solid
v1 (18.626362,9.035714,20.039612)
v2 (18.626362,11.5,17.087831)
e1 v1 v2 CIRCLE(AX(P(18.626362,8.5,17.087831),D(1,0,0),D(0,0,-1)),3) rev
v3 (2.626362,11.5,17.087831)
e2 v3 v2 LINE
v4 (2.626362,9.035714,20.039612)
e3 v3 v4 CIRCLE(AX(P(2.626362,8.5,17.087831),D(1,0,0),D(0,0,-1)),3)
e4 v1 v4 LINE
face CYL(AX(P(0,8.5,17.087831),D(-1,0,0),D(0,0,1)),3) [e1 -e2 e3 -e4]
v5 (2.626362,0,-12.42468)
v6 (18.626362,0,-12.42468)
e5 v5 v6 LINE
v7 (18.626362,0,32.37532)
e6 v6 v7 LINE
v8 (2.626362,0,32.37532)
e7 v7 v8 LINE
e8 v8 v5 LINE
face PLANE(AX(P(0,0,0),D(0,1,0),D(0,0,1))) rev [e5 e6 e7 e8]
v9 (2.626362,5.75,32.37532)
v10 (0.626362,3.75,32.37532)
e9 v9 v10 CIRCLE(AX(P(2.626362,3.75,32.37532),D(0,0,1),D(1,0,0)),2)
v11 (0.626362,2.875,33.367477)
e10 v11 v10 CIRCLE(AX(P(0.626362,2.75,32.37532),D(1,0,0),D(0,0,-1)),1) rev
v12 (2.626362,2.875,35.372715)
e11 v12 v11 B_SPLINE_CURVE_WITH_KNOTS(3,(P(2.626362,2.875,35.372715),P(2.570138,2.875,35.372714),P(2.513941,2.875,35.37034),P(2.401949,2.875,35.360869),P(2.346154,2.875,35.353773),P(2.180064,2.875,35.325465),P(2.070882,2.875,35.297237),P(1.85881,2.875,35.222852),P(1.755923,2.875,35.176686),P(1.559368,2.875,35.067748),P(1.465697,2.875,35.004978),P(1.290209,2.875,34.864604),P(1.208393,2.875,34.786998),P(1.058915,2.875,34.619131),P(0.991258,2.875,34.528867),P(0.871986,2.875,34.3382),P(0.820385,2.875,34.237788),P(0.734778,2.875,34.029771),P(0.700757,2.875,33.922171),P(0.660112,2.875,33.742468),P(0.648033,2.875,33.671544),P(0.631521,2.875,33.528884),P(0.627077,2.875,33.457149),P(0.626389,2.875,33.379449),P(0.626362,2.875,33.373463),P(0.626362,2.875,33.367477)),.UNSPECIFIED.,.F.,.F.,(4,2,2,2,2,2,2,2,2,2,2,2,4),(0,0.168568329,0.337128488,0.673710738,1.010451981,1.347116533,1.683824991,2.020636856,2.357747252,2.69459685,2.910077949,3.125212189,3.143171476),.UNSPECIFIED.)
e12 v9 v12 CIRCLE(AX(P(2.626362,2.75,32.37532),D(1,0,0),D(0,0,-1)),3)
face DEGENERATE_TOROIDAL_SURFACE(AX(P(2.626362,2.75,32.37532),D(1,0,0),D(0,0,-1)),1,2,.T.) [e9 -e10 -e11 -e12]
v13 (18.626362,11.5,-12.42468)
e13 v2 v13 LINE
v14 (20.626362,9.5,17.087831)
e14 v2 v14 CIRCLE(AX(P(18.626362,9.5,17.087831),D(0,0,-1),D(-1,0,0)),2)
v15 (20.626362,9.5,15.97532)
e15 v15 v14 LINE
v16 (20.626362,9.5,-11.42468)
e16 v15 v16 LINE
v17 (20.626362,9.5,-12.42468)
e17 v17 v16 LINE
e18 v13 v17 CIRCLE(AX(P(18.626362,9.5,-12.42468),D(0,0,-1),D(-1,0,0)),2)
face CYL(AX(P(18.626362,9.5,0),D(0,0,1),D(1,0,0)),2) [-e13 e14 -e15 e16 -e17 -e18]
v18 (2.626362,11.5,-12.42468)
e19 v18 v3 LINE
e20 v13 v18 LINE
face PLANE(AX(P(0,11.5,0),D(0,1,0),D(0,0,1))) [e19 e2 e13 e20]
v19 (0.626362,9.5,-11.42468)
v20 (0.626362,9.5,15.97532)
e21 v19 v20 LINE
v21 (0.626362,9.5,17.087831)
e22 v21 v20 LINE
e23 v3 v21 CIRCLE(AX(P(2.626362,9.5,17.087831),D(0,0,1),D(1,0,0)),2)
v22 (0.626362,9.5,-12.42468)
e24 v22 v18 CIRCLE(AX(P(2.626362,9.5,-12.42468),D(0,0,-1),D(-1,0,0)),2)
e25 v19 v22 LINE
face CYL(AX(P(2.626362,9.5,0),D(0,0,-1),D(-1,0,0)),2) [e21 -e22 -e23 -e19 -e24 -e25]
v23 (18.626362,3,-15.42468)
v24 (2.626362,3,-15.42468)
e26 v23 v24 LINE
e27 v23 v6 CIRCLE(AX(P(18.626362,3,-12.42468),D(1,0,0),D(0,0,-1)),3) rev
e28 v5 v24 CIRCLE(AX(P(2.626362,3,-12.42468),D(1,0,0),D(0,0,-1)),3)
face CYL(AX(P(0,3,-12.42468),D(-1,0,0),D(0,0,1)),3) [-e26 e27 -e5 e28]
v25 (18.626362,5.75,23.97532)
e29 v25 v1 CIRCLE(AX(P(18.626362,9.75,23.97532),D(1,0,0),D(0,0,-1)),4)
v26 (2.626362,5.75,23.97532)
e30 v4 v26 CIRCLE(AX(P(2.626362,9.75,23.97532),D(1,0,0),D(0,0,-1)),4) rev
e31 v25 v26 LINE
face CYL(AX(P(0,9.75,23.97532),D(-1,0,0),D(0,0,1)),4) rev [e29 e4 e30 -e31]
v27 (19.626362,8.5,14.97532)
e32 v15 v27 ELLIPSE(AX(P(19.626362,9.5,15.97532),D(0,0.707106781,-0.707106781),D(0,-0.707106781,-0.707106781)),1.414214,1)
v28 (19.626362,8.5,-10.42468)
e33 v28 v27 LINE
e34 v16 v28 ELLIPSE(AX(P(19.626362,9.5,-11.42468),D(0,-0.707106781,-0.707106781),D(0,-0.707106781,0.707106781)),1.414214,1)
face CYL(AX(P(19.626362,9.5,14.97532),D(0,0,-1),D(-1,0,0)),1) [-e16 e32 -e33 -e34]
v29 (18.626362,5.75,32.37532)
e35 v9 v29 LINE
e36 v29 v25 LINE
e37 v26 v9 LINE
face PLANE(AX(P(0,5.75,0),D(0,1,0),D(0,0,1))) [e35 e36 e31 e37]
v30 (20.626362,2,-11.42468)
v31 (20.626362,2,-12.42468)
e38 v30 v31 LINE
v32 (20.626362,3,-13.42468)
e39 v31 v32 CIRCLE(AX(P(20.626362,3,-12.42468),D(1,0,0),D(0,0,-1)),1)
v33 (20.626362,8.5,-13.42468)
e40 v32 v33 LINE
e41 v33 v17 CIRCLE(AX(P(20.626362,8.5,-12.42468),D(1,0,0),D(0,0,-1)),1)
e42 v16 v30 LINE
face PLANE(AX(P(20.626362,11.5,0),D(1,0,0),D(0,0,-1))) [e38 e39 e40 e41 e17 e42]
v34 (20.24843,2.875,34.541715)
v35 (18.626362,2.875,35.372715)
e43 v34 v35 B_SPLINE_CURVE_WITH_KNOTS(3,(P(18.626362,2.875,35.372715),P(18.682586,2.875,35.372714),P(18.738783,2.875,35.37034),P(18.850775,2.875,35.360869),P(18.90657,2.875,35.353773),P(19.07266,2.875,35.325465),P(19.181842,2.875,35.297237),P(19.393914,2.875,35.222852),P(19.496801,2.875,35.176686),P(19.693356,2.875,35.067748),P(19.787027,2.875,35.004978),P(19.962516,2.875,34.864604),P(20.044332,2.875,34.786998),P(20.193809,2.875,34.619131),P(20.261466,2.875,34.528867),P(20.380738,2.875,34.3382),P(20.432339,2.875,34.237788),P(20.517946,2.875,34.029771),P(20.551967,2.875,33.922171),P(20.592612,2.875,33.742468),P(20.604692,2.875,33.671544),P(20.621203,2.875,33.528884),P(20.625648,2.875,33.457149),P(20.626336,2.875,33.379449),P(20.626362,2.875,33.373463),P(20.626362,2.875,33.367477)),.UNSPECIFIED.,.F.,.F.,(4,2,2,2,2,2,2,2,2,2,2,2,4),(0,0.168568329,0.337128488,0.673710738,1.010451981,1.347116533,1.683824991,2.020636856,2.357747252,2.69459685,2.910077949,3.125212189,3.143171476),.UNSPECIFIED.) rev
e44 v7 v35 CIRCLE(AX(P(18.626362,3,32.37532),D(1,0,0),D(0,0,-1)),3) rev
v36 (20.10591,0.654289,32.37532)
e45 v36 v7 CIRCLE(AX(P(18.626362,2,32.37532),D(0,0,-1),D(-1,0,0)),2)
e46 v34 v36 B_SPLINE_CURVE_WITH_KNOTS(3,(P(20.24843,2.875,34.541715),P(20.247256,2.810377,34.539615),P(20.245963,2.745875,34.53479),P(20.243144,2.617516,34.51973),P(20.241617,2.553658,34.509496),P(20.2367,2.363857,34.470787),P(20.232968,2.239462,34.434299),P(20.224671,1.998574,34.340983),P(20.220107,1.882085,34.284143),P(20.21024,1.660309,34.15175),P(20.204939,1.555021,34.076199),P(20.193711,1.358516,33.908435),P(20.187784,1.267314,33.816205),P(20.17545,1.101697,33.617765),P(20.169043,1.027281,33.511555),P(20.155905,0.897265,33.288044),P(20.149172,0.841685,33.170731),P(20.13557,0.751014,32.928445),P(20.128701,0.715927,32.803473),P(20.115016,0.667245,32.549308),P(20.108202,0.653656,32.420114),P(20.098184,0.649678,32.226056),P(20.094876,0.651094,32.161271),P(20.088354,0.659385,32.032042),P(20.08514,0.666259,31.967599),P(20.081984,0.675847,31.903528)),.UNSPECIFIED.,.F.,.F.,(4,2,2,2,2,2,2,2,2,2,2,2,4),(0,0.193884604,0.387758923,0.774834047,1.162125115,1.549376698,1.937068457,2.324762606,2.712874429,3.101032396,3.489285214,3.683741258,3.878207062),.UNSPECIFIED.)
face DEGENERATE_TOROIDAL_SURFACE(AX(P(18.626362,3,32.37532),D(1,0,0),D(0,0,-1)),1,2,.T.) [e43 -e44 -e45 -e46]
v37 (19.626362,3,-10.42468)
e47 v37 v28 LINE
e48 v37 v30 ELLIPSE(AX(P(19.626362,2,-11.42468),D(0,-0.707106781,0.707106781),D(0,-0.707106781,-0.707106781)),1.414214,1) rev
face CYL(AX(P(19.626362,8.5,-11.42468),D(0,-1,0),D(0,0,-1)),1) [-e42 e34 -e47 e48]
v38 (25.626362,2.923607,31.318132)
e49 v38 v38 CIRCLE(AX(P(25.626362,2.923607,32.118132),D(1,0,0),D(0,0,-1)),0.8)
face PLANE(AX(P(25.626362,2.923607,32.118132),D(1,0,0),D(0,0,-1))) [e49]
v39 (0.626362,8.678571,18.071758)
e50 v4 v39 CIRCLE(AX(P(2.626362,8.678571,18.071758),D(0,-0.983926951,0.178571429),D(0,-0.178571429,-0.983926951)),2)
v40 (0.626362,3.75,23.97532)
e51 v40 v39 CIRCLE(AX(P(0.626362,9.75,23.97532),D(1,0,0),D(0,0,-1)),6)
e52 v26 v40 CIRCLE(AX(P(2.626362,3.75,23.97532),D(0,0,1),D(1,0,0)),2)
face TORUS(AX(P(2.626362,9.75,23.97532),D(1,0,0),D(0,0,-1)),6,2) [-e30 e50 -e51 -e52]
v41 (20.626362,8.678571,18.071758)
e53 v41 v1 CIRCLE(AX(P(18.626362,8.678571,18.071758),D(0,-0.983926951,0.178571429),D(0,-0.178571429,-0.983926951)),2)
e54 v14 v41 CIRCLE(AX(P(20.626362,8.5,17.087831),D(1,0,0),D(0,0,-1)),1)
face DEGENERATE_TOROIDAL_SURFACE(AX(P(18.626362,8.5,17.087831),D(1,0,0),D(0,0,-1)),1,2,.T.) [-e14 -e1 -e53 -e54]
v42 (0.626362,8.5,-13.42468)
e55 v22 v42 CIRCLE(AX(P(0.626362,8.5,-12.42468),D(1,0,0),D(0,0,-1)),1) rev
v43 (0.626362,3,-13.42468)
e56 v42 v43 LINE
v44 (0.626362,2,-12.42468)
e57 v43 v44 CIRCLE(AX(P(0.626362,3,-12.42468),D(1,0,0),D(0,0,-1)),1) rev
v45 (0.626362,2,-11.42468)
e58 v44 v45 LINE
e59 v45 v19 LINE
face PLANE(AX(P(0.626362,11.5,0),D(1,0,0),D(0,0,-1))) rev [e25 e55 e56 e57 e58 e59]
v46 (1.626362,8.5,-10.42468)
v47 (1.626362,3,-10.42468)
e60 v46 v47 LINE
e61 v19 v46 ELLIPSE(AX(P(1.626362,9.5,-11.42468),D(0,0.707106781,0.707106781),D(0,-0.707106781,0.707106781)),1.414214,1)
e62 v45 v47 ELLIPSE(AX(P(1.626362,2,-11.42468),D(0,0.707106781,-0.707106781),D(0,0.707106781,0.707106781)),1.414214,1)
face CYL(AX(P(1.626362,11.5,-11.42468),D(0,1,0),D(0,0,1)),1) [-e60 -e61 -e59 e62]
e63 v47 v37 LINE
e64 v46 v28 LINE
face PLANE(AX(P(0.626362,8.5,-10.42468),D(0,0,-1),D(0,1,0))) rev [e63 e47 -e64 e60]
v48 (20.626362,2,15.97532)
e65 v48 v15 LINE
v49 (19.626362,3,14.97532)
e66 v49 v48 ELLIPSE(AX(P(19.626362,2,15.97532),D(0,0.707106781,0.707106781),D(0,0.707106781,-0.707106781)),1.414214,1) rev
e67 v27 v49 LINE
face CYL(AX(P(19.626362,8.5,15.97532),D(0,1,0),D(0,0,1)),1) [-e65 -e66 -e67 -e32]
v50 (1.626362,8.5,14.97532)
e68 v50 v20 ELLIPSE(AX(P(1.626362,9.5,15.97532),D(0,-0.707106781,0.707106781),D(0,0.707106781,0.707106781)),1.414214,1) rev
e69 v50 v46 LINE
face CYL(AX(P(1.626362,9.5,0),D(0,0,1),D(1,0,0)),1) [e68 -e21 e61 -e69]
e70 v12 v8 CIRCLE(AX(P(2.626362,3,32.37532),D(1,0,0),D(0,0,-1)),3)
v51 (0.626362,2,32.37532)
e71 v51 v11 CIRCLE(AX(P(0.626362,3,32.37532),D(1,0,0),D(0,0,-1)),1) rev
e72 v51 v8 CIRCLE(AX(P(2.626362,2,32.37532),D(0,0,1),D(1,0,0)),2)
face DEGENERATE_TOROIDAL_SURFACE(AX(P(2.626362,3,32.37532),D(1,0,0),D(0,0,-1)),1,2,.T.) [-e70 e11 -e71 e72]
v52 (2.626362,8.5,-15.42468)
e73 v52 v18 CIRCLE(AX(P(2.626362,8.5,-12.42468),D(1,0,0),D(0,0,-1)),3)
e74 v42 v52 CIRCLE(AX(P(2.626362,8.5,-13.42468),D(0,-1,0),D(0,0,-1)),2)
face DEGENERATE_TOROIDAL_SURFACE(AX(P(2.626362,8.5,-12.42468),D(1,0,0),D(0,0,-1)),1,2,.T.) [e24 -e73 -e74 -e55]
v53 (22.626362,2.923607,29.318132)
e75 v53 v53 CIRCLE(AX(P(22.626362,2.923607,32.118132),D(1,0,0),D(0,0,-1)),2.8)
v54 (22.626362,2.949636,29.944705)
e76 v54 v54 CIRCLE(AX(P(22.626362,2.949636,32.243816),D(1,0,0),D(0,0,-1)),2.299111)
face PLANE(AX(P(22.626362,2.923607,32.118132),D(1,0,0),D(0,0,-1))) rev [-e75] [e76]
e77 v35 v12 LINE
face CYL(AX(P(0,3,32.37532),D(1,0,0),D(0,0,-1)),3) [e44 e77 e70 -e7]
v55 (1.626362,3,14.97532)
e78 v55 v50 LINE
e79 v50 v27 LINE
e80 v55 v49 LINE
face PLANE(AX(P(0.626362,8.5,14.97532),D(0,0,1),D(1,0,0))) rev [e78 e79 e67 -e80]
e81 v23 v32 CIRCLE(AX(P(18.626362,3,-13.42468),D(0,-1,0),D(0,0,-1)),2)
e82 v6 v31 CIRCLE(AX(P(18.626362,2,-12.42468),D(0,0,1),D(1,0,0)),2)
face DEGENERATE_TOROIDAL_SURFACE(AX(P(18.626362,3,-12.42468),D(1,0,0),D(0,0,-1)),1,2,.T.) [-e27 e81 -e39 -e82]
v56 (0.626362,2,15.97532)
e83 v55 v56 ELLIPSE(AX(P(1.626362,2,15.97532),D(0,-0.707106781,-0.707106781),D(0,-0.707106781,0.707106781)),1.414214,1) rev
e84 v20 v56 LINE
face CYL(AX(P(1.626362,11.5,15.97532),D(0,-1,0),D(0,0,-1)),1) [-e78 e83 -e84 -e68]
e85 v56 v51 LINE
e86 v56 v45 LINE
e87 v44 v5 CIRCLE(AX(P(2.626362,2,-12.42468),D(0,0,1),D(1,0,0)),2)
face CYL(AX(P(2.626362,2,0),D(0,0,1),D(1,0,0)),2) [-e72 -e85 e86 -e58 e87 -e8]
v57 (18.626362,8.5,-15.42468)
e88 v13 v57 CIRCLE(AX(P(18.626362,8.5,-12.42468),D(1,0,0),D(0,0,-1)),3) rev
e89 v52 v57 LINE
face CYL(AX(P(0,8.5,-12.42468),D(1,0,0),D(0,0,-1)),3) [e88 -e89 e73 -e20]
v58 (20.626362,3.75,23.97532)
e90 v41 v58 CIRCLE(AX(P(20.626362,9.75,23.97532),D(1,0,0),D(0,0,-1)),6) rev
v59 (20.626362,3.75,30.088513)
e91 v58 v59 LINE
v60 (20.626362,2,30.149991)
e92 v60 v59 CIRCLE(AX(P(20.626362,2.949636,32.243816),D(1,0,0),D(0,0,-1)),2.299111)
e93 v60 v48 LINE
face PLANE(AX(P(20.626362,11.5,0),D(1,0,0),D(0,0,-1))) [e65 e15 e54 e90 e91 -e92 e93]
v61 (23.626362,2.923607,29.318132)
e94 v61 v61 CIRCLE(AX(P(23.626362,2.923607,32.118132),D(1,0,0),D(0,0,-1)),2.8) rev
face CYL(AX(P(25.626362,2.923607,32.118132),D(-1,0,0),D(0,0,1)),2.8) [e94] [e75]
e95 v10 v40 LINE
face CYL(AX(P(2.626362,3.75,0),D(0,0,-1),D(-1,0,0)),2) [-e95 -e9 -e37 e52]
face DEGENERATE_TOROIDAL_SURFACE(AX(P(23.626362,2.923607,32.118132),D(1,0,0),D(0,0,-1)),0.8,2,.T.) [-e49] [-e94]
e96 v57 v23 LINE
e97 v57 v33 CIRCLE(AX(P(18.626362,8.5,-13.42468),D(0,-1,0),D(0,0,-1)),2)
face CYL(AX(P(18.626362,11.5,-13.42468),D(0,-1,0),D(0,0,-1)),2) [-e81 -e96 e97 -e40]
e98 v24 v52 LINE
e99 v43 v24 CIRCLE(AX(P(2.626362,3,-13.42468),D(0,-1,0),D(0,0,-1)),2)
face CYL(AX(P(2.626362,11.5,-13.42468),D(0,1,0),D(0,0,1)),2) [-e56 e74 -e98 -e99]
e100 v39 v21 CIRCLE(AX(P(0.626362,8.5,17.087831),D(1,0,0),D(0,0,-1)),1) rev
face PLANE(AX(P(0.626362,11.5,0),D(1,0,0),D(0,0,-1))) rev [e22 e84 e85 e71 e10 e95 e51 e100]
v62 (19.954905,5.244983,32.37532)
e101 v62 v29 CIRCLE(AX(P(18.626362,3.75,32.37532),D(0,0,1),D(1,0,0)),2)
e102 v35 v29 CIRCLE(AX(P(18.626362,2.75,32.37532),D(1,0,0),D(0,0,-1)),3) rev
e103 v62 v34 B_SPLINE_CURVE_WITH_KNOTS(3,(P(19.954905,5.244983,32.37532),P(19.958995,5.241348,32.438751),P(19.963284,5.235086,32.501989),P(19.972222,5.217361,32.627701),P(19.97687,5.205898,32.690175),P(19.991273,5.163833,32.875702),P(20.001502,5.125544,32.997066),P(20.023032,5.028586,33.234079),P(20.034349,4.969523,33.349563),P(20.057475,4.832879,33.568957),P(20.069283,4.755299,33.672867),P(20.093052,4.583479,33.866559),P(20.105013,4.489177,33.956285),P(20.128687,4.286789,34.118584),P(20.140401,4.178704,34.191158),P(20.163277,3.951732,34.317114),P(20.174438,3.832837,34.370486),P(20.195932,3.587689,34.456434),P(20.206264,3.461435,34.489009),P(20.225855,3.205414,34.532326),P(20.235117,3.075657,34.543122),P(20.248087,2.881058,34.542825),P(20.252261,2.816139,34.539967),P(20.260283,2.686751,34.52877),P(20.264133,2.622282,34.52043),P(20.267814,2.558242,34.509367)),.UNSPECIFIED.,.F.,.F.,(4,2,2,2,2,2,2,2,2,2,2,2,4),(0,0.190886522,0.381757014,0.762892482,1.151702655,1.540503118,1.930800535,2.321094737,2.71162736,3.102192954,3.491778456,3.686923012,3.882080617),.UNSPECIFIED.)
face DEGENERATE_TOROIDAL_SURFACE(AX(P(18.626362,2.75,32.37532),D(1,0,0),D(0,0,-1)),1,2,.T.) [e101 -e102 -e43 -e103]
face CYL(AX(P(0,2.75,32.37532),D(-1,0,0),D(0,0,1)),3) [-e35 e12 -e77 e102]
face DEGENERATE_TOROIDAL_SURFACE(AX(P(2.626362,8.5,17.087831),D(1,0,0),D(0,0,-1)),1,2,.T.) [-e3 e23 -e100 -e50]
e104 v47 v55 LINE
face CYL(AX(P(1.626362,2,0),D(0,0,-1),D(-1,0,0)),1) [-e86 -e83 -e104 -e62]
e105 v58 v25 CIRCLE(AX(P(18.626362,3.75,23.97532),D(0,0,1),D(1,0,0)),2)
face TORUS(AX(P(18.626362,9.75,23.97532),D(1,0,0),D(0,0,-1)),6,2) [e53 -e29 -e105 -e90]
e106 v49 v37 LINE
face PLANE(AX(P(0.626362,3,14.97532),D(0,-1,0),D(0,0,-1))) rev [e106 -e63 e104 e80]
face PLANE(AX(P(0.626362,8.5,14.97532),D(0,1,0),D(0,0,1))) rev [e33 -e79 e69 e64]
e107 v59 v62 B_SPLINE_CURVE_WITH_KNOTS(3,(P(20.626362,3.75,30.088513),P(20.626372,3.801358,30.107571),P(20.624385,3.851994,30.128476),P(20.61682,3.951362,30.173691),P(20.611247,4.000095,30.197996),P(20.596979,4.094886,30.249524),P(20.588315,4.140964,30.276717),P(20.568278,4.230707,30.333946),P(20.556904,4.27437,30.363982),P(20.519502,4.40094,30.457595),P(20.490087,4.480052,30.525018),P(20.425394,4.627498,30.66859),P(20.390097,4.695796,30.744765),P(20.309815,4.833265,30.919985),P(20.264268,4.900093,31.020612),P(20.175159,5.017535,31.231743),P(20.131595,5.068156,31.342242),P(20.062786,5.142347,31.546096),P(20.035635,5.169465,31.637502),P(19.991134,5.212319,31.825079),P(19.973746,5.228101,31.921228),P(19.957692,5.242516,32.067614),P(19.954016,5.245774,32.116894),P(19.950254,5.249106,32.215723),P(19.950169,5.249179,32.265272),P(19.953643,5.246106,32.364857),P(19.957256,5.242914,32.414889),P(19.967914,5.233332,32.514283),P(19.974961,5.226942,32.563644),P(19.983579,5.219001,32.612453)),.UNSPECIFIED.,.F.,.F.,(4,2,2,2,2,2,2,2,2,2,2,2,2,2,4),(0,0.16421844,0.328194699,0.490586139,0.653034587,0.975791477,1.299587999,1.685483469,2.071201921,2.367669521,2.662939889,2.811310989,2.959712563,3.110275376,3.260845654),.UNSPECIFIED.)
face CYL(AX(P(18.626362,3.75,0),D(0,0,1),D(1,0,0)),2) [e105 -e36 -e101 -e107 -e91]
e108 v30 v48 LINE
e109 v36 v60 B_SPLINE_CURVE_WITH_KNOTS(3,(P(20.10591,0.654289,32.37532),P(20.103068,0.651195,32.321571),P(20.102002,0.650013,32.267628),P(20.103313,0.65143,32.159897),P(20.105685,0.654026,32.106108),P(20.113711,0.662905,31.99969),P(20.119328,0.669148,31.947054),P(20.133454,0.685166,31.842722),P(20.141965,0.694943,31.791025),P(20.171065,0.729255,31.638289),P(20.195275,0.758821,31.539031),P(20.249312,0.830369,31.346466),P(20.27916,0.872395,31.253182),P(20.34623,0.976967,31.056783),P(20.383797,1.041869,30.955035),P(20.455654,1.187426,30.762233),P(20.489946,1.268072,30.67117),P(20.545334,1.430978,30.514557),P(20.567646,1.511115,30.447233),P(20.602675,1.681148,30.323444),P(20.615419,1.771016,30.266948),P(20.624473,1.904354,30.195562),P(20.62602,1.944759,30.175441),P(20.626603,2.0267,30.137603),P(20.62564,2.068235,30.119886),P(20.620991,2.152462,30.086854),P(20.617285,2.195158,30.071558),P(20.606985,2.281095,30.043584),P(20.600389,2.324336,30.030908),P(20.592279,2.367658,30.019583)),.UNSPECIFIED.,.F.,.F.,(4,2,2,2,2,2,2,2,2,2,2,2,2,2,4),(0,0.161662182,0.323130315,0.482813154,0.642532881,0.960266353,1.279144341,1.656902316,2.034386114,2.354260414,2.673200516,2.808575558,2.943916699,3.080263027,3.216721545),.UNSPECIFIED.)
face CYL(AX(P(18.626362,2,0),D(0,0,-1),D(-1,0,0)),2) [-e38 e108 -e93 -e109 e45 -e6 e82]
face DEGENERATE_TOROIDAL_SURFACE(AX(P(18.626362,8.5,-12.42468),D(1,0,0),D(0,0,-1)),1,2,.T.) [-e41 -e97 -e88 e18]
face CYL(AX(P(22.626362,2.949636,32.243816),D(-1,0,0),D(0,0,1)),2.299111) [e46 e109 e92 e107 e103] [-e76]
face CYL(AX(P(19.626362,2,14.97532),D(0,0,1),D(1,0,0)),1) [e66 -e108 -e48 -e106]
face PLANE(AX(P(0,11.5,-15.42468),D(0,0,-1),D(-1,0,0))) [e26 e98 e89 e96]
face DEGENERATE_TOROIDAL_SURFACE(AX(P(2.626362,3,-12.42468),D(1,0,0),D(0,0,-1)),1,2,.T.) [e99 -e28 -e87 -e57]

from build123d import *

# Parameters (mm, degrees)
SKETCH1_W           = 20
SKETCH1_H           = 25.4
BOSS_EXTRUDE1_DEPTH = 11.5
SKETCH1_3_W         = 20
SKETCH1_3_H         = 25.4
BOSS_EXTRUDE2_DEPTH = 5.75
SKETCH3_W           = 20
SKETCH3_H           = 5.75
BOSS_EXTRUDE3_DEPTH = 10
SKETCH4_W           = 25.4
SKETCH4_H           = 5.5
CUT_EXTRUDE1_DEPTH  = 43.233437778
FILLET1_R           = 1
FILLET2_R           = 1
FILLET3_R           = 3
FILLET4_R           = 3
FILLET5_R           = 4
FILLET6_R           = 3
SKETCH6_R           = 2.299110901
BOSS_EXTRUDE4_DEPTH = 2
FILLET7_R           = 3
SKETCH8_R           = 2.8
BOSS_EXTRUDE6_DEPTH = 3
FILLET9_R           = 2
FILLET10_R          = 2
FILLET11_R          = 2


with BuildPart() as part:
    # Sketch1 → Boss-Extrude1 (new body)
    with BuildSketch(Plane(origin=(0, 0, 0), x_dir=(1, 0, 0), z_dir=(0, 1, 0))):
        with Locations((10.626362144, 2.72467998)):
            Rectangle(SKETCH1_W, SKETCH1_H)
    extrude(amount=BOSS_EXTRUDE1_DEPTH)

    # Sketch1<3> → Boss-Extrude2 (add)
    with BuildSketch(Plane(origin=(0, 0, 0), x_dir=(1, 0, 0), z_dir=(0, 1, 0))):
        with Locations((10.626362144, -22.67532002)):
            Rectangle(SKETCH1_3_W, SKETCH1_3_H)
    extrude(amount=BOSS_EXTRUDE2_DEPTH)

    # Sketch3 → Boss-Extrude3 (add)
    with BuildSketch(Plane.XY.offset(9.97532002)):
        with Locations((10.626362144, 8.625)):
            Rectangle(SKETCH3_W, SKETCH3_H)
    extrude(amount=BOSS_EXTRUDE3_DEPTH)

    # Sketch4 → Cut-Extrude1 (cut, through all)
    with BuildSketch(Plane(origin=(20.626362144, 0, 0), x_dir=(0, 0, -1), z_dir=(1, 0, 0))):
        with Locations((-2.27532002, 5.75)):
            Rectangle(SKETCH4_W, SKETCH4_H)
    extrude(amount=-CUT_EXTRUDE1_DEPTH, mode=Mode.SUBTRACT)

    # Fillet1
    fillet1_edges = [part.edges().sort_by_distance(p)[0] for p in [
        (20.626362144, 5.75, 14.97532002),
        (20.626362144, 3, 2.27532002),
        (20.626362144, 5.75, -10.42467998),
        (20.626362144, 8.5, 2.27532002),
    ]]
    fillet(fillet1_edges, radius=FILLET1_R)

    # Fillet2
    fillet2_edges = [part.edges().sort_by_distance(p)[0] for p in [
        (0.626362144, 5.75, 14.97532002),
        (0.626362144, 8.5, 2.27532002),
        (0.626362144, 5.75, -10.42467998),
        (0.626362144, 3, 2.27532002),
    ]]
    fillet(fillet2_edges, radius=FILLET2_R)

    # Fillet3
    fillet3_edges = [part.edges().sort_by_distance(p)[0] for p in [
        (10.626362144, 11.5, -15.42467998),
    ]]
    fillet(fillet3_edges, radius=FILLET3_R)

    # Fillet4
    fillet4_edges = [part.edges().sort_by_distance(p)[0] for p in [
        (10.626362144, 0, -15.42467998),
    ]]
    fillet(fillet4_edges, radius=FILLET4_R)

    # Fillet5
    fillet5_edges = [part.edges().sort_by_distance(p)[0] for p in [
        (10.626362144, 5.75, 19.97532002),
    ]]
    fillet(fillet5_edges, radius=FILLET5_R)

    # Fillet6
    fillet6_edges = [part.edges().sort_by_distance(p)[0] for p in [
        (10.626362144, 11.5, 19.97532002),
    ]]
    fillet(fillet6_edges, radius=FILLET6_R)

    # Sketch6 → Boss-Extrude4 (add)
    with BuildSketch(Plane(origin=(20.626362144, 0, 0), x_dir=(0, 0, -1), z_dir=(1, 0, 0))):
        with Locations((-32.243815698, 2.949635855)):
            Circle(SKETCH6_R)
    extrude(amount=BOSS_EXTRUDE4_DEPTH)

    # Fillet7
    # the kernel refuses this fillet: 3 mm, written as the material it takes off along each edge
    with BuildSketch(Plane(origin=(-6.873637856, 0, 35.37532002), x_dir=(0, 1, 0), z_dir=(1, 0, 0)), Plane(origin=(-6.873637856, 5.75, 35.37532002), x_dir=(0, 0, -1), z_dir=(1, 0, 0))) as fillet7_piece_1:
        with BuildLine():
            CenterArc((FILLET7_R, -FILLET7_R), FILLET7_R, 90, 90)
            Line((0, -FILLET7_R), (0, 0))
            Line((0, 0), (FILLET7_R, 0))
        make_face()
    extrude(amount=35, mode=Mode.SUBTRACT)

    # Sketch8 → Boss-Extrude6 (add)
    with BuildSketch(Plane(origin=(22.626362144, 0, 0), x_dir=(0, 0, -1), z_dir=(1, 0, 0))):
        with Locations((-32.118132116, 2.923606681)):
            Circle(SKETCH8_R)
    extrude(amount=BOSS_EXTRUDE6_DEPTH)

    # Fillet9
    fillet9_edges = [part.edges().sort_by_distance(p)[0] for p in [
        (25.626362144, 2.923606681, 34.918132116),
    ]]
    fillet(fillet9_edges, radius=FILLET9_R)

    # Fillet10
    # the kernel refuses this fillet: 2 mm, written as the material it takes off along each edge
    with BuildSketch(Plane(origin=(0.626362144, 9.75, 23.97532002), x_dir=(0, -0.17857142857142888, -0.9839269509968508), z_dir=(0, 0.9839269509968508, -0.17857142857142888))) as fillet10_piece_1:
        with BuildLine():
            CenterArc((4 + FILLET10_R, -FILLET10_R), FILLET10_R, 90, 90)
            Line((4 + FILLET10_R, 0), (4, 0))
            Line((4, 0), (4, -FILLET10_R))
        make_face()
    revolve(axis=Axis((0.626362144, 9.75, 23.97532002), (-1, 0, 0)), revolution_arc=79.713439389, mode=Mode.SUBTRACT)
    with BuildSketch(Plane(origin=(0.626362144, 8.500000013, 17.087831374), x_dir=(0, 0.17857142509559704, 0.9839269516276742), z_dir=(0, -0.9839269516276742, 0.17857142509559704))) as fillet10_piece_2:
        with BuildLine():
            CenterArc((2.999999987 - FILLET10_R * 1.00000000192, -FILLET10_R), FILLET10_R, 360, 90)
            Line((2.999999987 - FILLET10_R * 1.00000000192, 0), (2.999999987, 0))
            Line((2.999999987, 0), (2.999999987 - FILLET10_R * 1.92114524289e-09, -FILLET10_R))
        make_face()
    revolve(axis=Axis((0.626362144, 8.500000013, 17.087831374), (-1, 0, 0)), revolution_arc=79.713439793, mode=Mode.SUBTRACT)
    with BuildSketch(Plane(origin=(0.626362144, 2.75, 32.37532002), x_dir=(0, -0.9984974283407907, -0.05479859119382269), z_dir=(0, 0.05479859119382269, -0.9984974283407907))) as fillet10_piece_3:
        with BuildLine():
            CenterArc((3 - FILLET10_R, -FILLET10_R), FILLET10_R, 0, 90)
            Line((3 - FILLET10_R, 0), (3, 0))
            Line((3, 0), (3, -FILLET10_R))
        make_face()
    revolve(axis=Axis((0.626362144, 2.75, 32.37532002), (-1, 0, 0)), revolution_arc=183.1413015, mode=Mode.SUBTRACT)
    with BuildSketch(Plane(origin=(0.626362144, 3, 32.37532002), x_dir=(0, -1, 0), z_dir=(0, 0, -1))) as fillet10_piece_4:
        with BuildLine():
            CenterArc((3 - FILLET10_R, -FILLET10_R), FILLET10_R, 0, 90)
            Line((3 - FILLET10_R, 0), (3, 0))
            Line((3, 0), (3, -FILLET10_R))
        make_face()
    revolve(axis=Axis((0.626362144, 3, 32.37532002), (-1, 0, 0)), revolution_arc=183.1413015, mode=Mode.SUBTRACT)
    with BuildSketch(Plane(origin=(0.626362144, 3, -15.42467998), x_dir=(1, 0, 0), z_dir=(0, 1, 0))) as fillet10_piece_5:
        with BuildLine():
            CenterArc((FILLET10_R, -FILLET10_R), FILLET10_R, 90, 90)
            Line((0, -FILLET10_R), (0, 0))
            Line((0, 0), (FILLET10_R, 0))
        make_face()
    extrude(amount=5.5, mode=Mode.SUBTRACT)
    with BuildSketch(Plane(origin=(0.626362144, 11.5, 17.087831364), x_dir=(1, 0, 0), z_dir=(0, 0, -1))) as fillet10_piece_6:
        with BuildLine():
            CenterArc((FILLET10_R, FILLET10_R), FILLET10_R, 180, 90)
            Line((0, FILLET10_R), (0, 0))
            Line((0, 0), (FILLET10_R, 0))
        make_face()
    extrude(amount=29.512511343, mode=Mode.SUBTRACT)
    with BuildSketch(Plane(origin=(0.626362144, 8.5, -12.42467998), x_dir=(0, 0, -1), z_dir=(0, -1, 0))) as fillet10_piece_7:
        with BuildLine():
            CenterArc((3 - FILLET10_R, FILLET10_R), FILLET10_R, 270, 90)
            Line((3 - FILLET10_R, 0), (3, 0))
            Line((3, 0), (3, FILLET10_R))
        make_face()
    revolve(axis=Axis((0.626362144, 8.5, -12.42467998), (1, 0, 0)), revolution_arc=90, mode=Mode.SUBTRACT)
    with BuildSketch(Plane(origin=(0.626362144, 0, -12.42467998), x_dir=(1, 0, 0), z_dir=(0, 0, 1))) as fillet10_piece_8:
        with BuildLine():
            CenterArc((FILLET10_R, FILLET10_R), FILLET10_R, 180, 90)
            Line((0, FILLET10_R), (0, 0))
            Line((0, 0), (FILLET10_R, 0))
        make_face()
    extrude(amount=44.8, mode=Mode.SUBTRACT)
    with BuildSketch(Plane(origin=(0.626362144, 3, -12.42467998), x_dir=(0, 0, -1), z_dir=(0, 1, 0))) as fillet10_piece_9:
        with BuildLine():
            CenterArc((3 - FILLET10_R, -FILLET10_R), FILLET10_R, 0, 90)
            Line((3 - FILLET10_R, 0), (3, 0))
            Line((3, 0), (3, -FILLET10_R))
        make_face()
    revolve(axis=Axis((0.626362144, 3, -12.42467998), (-1, 0, 0)), revolution_arc=90, mode=Mode.SUBTRACT)
    with BuildSketch(Plane(origin=(0.626362144, 5.75, 23.97532002), x_dir=(1, 0, 0), z_dir=(0, 0, 1))) as fillet10_piece_10:
        with BuildLine():
            CenterArc((FILLET10_R, -FILLET10_R), FILLET10_R, 90, 90)
            Line((0, -FILLET10_R), (0, 0))
            Line((0, 0), (FILLET10_R, 0))
        make_face()
    extrude(amount=8.4, mode=Mode.SUBTRACT)

    # Fillet11
    # the kernel refuses this fillet: 2 mm, written as the material it takes off along each edge
    with BuildSketch(Plane(origin=(20.626362144, 0, 32.37532002), x_dir=(0, 1, 0), z_dir=(0, 0, -1))) as fillet11_piece_1_section:
        with BuildLine():
            CenterArc((FILLET11_R, -FILLET11_R), FILLET11_R, 90, 90)
            Line((0, -FILLET11_R), (0, 0))
            Line((0, 0), (FILLET11_R, 0))
        make_face()
    fillet11_piece_1 = extrude(amount=44.8, mode=Mode.PRIVATE)
    fillet11_piece_1 = fillet11_piece_1 - Plane(origin=(20.626362144, 2.949635855, 32.243815698), x_dir=(0, 0, -1), z_dir=(-1, 0, 0)) * Cylinder(2.299110901, 98, mode=Mode.PRIVATE)
    add(fillet11_piece_1, mode=Mode.SUBTRACT)
    with BuildSketch(Plane(origin=(20.626362144, 3, -12.42467998), x_dir=(0, 0, -1), z_dir=(0, 1, 0))) as fillet11_piece_2:
        with BuildLine():
            CenterArc((3 - FILLET11_R, FILLET11_R), FILLET11_R, 270, 90)
            Line((3, FILLET11_R), (3, 0))
            Line((3, 0), (3 - FILLET11_R, 0))
        make_face()
    revolve(axis=Axis((20.626362144, 3, -12.42467998), (-1, 0, 0)), revolution_arc=90, mode=Mode.SUBTRACT)
    with BuildSketch(Plane(origin=(20.626362144, 3, -15.42467998), x_dir=(0, 0, 1), z_dir=(0, 1, 0))) as fillet11_piece_3:
        with BuildLine():
            CenterArc((FILLET11_R, -FILLET11_R), FILLET11_R, 90, 90)
            Line((0, -FILLET11_R), (0, 0))
            Line((0, 0), (FILLET11_R, 0))
        make_face()
    extrude(amount=5.5, mode=Mode.SUBTRACT)
    with BuildSketch(Plane(origin=(20.626362144, 8.5, -12.42467998), x_dir=(0, 0, -1), z_dir=(0, -1, 0))) as fillet11_piece_4:
        with BuildLine():
            CenterArc((3 - FILLET11_R, -FILLET11_R), FILLET11_R, 0, 90)
            Line((3, -FILLET11_R), (3, 0))
            Line((3, 0), (3 - FILLET11_R, 0))
        make_face()
    revolve(axis=Axis((20.626362144, 8.5, -12.42467998), (1, 0, 0)), revolution_arc=90, mode=Mode.SUBTRACT)
    with BuildSketch(Plane(origin=(20.626362144, 5.75, 32.37532002), x_dir=(0, -1, 0), z_dir=(0, 0, -1))) as fillet11_piece_5_section:
        with BuildLine():
            CenterArc((FILLET11_R, FILLET11_R), FILLET11_R, 180, 90)
            Line((0, FILLET11_R), (0, 0))
            Line((0, 0), (FILLET11_R, 0))
        make_face()
    fillet11_piece_5 = extrude(amount=8.4, mode=Mode.PRIVATE)
    fillet11_piece_5 = fillet11_piece_5 - Plane(origin=(20.626362144, 2.949635855, 32.243815698), x_dir=(0, 0, -1), z_dir=(-1, 0, 0)) * Cylinder(2.299110901, 25, mode=Mode.PRIVATE)
    add(fillet11_piece_5, mode=Mode.SUBTRACT)
    with BuildSketch(Plane(origin=(20.626362144, 9.75, 23.97532002), x_dir=(0, -0.17857142857142888, -0.9839269509968508), z_dir=(0, 0.9839269509968508, -0.17857142857142888))) as fillet11_piece_6:
        with BuildLine():
            CenterArc((4 + FILLET11_R, FILLET11_R), FILLET11_R, 180, 90)
            Line((4, FILLET11_R), (4, 0))
            Line((4, 0), (4 + FILLET11_R, 0))
        make_face()
    revolve(axis=Axis((20.626362144, 9.75, 23.97532002), (-1, 0, 0)), revolution_arc=79.713439389, mode=Mode.SUBTRACT)
    with BuildSketch(Plane(origin=(20.626362144, 8.500000013, 17.087831374), x_dir=(0, 0.178571425095601, 0.9839269516276735), z_dir=(0, -0.9839269516276735, 0.178571425095601))) as fillet11_piece_7:
        with BuildLine():
            CenterArc((2.999999987 - FILLET11_R * 1.00000000192, FILLET11_R), FILLET11_R, 270, 90)
            Line((2.999999987 - FILLET11_R * 1.92114324449e-09, FILLET11_R), (2.999999987, 0))
            Line((2.999999987, 0), (2.999999987 - FILLET11_R * 1.00000000192, 0))
        make_face()
    revolve(axis=Axis((20.626362144, 8.500000013, 17.087831374), (-1, 0, 0)), revolution_arc=79.713439793, mode=Mode.SUBTRACT)
    with BuildSketch(Plane(origin=(20.626362144, 11.5, 17.087831364), x_dir=(0, -1, 0), z_dir=(0, 0, -1))) as fillet11_piece_8:
        with BuildLine():
            CenterArc((FILLET11_R, FILLET11_R), FILLET11_R, 180, 90)
            Line((0, FILLET11_R), (0, 0))
            Line((0, 0), (FILLET11_R, 0))
        make_face()
    extrude(amount=29.512511343, mode=Mode.SUBTRACT)
    with BuildSketch(Plane(origin=(20.626362144, 2.75, 32.37532002), x_dir=(0, -0.9984974283407908, -0.05479859119382033), z_dir=(0, 0.05479859119382033, -0.9984974283407908))) as fillet11_piece_9_section:
        with BuildLine():
            CenterArc((3 - FILLET11_R, FILLET11_R), FILLET11_R, 270, 90)
            Line((3, FILLET11_R), (3, 0))
            Line((3, 0), (3 - FILLET11_R, 0))
        make_face()
    fillet11_piece_9 = revolve(axis=Axis((20.626362144, 2.75, 32.37532002), (-1, 0, 0)), revolution_arc=183.1413015, mode=Mode.PRIVATE)
    fillet11_piece_9 = fillet11_piece_9 - Plane(origin=(20.626362144, 2.949635855, 32.243815698), x_dir=(0, 0, -1), z_dir=(-1, 0, 0)) * Cylinder(2.299110901, 13, mode=Mode.PRIVATE)
    add(fillet11_piece_9, mode=Mode.SUBTRACT)
    with BuildSketch(Plane(origin=(20.626362144, 3, 32.37532002), x_dir=(0, -1, 0), z_dir=(0, 0, -1))) as fillet11_piece_10_section:
        with BuildLine():
            CenterArc((3 - FILLET11_R, FILLET11_R), FILLET11_R, 270, 90)
            Line((3, FILLET11_R), (3, 0))
            Line((3, 0), (3 - FILLET11_R, 0))
        make_face()
    fillet11_piece_10 = revolve(axis=Axis((20.626362144, 3, 32.37532002), (-1, 0, 0)), revolution_arc=183.1413015, mode=Mode.PRIVATE)
    fillet11_piece_10 = fillet11_piece_10 - Plane(origin=(20.626362144, 2.949635855, 32.243815698), x_dir=(0, 0, -1), z_dir=(-1, 0, 0)) * Cylinder(2.299110901, 12, mode=Mode.PRIVATE)
    add(fillet11_piece_10, mode=Mode.SUBTRACT)


solid = part.part
